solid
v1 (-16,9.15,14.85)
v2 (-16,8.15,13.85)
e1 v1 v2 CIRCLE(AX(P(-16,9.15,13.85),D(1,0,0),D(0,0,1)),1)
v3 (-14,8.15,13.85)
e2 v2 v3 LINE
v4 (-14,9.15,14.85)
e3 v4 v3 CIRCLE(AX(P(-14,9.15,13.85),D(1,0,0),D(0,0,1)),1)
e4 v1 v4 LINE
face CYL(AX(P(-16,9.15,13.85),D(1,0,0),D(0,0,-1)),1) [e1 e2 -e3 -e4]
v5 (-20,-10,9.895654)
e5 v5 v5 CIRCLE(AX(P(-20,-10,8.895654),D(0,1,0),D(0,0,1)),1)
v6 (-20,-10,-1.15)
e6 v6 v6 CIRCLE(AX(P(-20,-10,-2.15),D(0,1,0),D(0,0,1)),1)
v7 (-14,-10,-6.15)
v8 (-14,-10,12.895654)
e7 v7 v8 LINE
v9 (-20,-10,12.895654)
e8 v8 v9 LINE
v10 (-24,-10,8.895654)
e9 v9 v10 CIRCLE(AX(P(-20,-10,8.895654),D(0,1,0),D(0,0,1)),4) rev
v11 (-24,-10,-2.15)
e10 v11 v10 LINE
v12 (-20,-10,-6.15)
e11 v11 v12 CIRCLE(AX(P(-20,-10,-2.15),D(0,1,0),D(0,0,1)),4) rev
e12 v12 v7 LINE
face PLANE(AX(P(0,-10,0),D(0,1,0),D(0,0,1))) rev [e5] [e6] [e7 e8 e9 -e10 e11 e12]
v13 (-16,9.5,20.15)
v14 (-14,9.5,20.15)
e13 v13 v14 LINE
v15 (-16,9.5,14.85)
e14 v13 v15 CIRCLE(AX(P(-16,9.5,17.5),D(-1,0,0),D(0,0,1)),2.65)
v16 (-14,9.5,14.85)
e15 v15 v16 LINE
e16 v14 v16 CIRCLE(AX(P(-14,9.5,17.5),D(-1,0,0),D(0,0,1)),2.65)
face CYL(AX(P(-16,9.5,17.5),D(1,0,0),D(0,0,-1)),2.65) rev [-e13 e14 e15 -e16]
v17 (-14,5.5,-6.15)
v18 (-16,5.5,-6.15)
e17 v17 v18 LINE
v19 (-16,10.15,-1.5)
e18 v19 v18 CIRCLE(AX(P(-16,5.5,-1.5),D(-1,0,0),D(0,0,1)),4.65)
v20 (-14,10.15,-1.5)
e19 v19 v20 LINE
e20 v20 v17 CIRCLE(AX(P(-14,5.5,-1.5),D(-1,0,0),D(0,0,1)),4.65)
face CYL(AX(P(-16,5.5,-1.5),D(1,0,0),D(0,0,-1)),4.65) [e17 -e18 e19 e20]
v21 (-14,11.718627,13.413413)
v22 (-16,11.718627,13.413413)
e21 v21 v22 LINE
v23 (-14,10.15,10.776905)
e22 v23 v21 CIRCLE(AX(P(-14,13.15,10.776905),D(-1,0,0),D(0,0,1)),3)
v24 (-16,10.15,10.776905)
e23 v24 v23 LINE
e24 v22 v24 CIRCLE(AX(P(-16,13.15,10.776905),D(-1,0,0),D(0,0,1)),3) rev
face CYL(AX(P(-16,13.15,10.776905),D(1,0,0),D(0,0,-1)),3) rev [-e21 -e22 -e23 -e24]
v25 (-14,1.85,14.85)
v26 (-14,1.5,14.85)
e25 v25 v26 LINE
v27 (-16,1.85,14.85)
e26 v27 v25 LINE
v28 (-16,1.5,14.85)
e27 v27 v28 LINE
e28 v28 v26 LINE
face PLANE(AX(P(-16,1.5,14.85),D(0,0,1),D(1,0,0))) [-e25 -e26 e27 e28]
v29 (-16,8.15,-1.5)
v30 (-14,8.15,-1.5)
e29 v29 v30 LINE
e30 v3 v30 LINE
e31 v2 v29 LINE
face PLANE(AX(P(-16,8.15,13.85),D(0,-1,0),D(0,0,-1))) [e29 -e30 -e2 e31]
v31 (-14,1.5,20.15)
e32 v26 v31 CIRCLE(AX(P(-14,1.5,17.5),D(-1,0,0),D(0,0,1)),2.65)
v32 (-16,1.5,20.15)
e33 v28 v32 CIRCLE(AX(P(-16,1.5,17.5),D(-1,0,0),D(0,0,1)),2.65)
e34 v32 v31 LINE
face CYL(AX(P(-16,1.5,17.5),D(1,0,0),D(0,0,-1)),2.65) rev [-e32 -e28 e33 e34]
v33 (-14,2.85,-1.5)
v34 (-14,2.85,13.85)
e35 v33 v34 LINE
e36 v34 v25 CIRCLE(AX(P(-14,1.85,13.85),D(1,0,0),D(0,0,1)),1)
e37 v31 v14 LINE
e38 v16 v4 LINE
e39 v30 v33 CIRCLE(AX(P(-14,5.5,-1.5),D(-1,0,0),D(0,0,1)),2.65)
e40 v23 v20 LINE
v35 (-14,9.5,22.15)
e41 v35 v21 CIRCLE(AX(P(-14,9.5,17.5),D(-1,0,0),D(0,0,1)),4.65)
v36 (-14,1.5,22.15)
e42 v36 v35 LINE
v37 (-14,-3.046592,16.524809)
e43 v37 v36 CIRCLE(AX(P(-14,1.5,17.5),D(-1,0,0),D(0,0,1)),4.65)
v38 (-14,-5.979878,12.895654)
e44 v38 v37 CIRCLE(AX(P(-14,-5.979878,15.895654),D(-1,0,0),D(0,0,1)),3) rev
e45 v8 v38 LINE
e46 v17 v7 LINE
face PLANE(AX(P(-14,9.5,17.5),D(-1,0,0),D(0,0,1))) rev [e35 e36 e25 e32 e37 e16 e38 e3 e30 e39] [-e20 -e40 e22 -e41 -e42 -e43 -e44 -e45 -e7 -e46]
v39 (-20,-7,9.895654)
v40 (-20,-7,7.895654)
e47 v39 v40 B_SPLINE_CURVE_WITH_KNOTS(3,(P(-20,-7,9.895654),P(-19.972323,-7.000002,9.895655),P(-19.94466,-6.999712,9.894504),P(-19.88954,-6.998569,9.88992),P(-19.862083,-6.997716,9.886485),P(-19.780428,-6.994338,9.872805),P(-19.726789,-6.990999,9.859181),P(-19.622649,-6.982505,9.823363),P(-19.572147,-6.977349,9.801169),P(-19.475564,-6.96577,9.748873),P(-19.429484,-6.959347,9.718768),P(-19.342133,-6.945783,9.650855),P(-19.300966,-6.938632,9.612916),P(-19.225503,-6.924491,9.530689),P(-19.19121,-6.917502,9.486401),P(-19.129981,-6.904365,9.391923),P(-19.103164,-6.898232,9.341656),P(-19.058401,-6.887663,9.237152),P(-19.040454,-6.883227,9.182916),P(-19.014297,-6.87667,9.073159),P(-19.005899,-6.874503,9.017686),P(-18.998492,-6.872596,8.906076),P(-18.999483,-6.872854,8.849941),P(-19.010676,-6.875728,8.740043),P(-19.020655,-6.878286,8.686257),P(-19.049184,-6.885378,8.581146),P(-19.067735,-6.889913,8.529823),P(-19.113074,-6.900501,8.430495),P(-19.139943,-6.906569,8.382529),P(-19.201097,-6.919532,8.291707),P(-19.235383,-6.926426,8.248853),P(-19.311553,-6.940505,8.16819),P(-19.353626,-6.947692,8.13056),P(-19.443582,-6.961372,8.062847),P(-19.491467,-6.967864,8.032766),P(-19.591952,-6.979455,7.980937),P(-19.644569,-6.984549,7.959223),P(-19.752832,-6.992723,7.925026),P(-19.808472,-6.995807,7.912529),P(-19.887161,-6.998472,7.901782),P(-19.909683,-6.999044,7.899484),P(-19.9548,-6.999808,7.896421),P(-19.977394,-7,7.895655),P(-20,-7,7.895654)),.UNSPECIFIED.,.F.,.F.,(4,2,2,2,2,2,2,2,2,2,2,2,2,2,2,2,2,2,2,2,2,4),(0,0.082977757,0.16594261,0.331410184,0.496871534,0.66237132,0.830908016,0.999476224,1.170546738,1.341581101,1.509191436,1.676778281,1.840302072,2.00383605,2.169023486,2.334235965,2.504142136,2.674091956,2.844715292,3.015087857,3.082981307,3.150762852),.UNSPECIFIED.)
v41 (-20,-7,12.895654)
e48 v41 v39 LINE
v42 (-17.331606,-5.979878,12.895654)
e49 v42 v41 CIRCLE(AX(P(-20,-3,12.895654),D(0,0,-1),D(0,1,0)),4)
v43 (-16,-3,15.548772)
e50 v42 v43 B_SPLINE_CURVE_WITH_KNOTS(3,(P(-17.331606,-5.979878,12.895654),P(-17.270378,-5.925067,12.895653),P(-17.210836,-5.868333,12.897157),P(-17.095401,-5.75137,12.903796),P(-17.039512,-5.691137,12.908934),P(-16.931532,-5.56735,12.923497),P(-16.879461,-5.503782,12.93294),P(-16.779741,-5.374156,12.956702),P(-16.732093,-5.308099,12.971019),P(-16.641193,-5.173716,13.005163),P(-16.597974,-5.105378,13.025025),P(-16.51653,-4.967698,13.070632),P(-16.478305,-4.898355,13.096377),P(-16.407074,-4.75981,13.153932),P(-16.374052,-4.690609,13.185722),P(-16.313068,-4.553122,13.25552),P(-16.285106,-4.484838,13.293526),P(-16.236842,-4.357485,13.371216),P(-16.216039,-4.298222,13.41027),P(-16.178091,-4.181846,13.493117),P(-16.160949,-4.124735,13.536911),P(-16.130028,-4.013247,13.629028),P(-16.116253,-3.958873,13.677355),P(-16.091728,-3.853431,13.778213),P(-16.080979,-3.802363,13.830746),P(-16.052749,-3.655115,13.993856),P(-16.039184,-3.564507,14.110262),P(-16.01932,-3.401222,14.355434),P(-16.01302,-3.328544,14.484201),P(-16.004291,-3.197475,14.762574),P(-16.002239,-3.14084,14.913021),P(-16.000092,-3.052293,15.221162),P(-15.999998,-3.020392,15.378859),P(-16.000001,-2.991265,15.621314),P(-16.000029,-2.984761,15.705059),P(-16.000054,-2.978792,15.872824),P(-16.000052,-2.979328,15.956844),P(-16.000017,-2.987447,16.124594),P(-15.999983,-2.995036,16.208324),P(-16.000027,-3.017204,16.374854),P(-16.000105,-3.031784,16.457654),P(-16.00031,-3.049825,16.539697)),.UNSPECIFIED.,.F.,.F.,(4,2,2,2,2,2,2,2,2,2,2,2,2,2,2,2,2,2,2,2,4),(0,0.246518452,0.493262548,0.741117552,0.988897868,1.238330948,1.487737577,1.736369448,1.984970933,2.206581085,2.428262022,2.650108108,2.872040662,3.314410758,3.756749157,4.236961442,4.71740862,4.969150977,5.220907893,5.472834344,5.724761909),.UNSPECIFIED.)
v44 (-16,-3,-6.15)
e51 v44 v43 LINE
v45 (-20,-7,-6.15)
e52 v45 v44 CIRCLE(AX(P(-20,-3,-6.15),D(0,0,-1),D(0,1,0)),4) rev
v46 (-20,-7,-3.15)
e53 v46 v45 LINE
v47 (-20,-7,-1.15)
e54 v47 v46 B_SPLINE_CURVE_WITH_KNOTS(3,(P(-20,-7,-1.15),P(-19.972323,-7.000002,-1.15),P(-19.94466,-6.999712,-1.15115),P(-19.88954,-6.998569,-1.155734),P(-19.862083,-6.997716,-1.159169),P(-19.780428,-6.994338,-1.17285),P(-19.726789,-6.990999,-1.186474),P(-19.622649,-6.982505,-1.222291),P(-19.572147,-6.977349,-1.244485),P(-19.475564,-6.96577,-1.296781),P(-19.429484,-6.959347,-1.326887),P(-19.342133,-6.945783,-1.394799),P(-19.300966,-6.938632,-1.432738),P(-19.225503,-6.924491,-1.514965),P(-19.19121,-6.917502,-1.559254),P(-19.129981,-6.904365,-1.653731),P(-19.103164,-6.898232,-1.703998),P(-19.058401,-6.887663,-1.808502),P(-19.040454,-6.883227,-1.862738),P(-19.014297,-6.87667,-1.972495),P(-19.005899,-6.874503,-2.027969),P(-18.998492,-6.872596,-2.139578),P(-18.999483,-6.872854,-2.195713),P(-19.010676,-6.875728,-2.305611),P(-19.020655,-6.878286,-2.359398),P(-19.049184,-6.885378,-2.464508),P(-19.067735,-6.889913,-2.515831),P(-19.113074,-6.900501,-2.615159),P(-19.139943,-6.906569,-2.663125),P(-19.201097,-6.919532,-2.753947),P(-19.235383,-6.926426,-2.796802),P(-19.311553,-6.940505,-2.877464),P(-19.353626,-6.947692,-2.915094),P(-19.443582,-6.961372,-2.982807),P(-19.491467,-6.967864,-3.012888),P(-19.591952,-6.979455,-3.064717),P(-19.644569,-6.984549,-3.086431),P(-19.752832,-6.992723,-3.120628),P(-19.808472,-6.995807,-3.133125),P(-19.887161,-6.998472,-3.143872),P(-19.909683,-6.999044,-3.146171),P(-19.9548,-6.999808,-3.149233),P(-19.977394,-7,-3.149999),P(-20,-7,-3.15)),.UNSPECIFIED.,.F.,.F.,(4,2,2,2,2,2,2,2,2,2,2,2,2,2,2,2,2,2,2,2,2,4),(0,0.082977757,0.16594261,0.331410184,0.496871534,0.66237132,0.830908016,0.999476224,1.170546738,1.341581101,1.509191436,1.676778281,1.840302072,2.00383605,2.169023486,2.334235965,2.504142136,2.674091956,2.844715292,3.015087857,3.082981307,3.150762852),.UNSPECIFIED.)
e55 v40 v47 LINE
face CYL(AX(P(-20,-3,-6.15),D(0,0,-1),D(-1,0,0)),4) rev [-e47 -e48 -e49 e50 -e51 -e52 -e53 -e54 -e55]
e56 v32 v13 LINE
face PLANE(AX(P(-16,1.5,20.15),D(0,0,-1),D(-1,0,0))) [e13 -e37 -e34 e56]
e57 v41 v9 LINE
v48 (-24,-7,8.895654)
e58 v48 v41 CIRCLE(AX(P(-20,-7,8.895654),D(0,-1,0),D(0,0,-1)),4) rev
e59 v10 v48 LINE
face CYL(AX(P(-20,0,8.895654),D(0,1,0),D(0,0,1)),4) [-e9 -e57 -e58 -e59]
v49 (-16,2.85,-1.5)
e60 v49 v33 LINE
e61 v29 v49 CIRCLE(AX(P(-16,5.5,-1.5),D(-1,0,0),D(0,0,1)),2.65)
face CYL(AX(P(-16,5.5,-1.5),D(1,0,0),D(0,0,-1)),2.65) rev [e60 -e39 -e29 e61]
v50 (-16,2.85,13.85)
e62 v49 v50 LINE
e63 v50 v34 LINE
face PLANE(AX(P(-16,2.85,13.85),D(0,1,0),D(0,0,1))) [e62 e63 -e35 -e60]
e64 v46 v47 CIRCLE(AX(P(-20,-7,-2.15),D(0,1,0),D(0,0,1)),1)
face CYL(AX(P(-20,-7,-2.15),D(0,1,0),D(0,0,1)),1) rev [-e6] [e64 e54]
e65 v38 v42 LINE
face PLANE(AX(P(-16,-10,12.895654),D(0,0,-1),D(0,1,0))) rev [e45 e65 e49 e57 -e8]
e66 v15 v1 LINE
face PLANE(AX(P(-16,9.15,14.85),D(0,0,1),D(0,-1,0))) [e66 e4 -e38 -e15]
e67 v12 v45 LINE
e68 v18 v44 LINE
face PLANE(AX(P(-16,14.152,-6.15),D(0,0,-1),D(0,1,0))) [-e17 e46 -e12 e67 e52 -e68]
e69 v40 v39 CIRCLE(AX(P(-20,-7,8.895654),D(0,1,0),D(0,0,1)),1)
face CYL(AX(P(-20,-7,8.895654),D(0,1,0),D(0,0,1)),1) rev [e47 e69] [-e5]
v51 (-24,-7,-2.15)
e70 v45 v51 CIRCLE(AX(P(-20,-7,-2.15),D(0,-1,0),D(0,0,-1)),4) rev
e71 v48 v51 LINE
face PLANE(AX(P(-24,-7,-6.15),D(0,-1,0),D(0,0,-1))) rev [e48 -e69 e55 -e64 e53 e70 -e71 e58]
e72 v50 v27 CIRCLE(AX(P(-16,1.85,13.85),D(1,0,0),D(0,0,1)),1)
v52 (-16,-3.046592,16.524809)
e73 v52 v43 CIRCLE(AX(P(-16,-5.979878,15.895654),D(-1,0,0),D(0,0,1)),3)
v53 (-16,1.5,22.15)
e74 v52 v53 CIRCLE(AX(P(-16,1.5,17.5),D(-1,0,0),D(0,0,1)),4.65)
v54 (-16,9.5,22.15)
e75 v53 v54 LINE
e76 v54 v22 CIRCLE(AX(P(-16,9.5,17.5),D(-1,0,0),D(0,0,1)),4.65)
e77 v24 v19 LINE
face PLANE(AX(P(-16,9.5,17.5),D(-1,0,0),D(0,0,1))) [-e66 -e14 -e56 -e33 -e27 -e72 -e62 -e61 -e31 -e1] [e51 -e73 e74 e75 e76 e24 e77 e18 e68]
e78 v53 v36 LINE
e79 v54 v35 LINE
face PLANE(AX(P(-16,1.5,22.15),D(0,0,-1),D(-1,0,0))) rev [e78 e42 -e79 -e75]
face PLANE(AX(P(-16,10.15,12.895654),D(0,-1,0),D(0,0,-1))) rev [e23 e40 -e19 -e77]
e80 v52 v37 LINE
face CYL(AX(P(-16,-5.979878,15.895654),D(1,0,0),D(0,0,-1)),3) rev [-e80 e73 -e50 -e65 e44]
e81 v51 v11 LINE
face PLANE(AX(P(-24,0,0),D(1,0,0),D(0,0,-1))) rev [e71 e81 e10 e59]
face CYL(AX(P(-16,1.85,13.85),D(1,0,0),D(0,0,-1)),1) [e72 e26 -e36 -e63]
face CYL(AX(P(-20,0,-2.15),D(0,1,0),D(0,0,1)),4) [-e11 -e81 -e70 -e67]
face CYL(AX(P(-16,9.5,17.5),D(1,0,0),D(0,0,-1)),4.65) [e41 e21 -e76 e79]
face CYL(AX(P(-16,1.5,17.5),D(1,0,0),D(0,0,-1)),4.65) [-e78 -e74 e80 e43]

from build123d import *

# Parameters (mm, degrees)
BOSS_EXTRUDE1_DEPTH = 2
BOSS_EXTRUDE2_START = -16
BOSS_EXTRUDE2_DEPTH = 2
SKETCH3_W           = 19.045654227
SKETCH3_H           = 3
BOSS_EXTRUDE3_DEPTH = 8
FILLET1_R           = 4
SKETCH5_W           = 1
SKETCH5_H           = 3
HOLE1_AT_2_COUNT    = 2
HOLE1_AT_2_PITCH    = 11.045654227
CUT_EXTRUDE1_START  = 2
SKETCH6_R           = 1
CUT_EXTRUDE1_DEPTH  = 2
FILLET2_R           = 3
FILLET3_R           = 3


# Read off the part's stored shape, not the designer's step: Boss-Extrude2
with BuildPart() as part:
    # Sketch1 → Boss-Extrude1 (new body)
    with BuildSketch(Plane.ZY.offset(14)):
        with BuildLine():
            Line((12.895654227, 10.15), (-1.5, 10.15))
            ThreePointArc((-1.5, 10.15), (-6.15, 5.5), (-1.5, 0.85))
            Line((-1.5, 0.85), (12.895654227, 0.85))
            ThreePointArc((12.895654227, 0.85), (17.825800671, -3.138572401), (22.15, 1.5))
            Line((22.15, 1.5), (22.15, 9.5))
            ThreePointArc((22.15, 9.5), (17.825800671, 14.138572401), (12.895654227, 10.15))
        make_face()
        with BuildLine():
            Line((13.85, 8.15), (-1.5, 8.15))
            ThreePointArc((-1.5, 8.15), (-4.15, 5.5), (-1.5, 2.85))
            Line((-1.5, 2.85), (13.85, 2.85))
            ThreePointArc((13.85, 2.85), (14.557106781, 2.557106781), (14.85, 1.85))
            Line((14.85, 1.85), (14.85, 1.5))
            ThreePointArc((14.85, 1.5), (17.5, -1.15), (20.15, 1.5))
            Line((20.15, 1.5), (20.15, 9.5))
            ThreePointArc((20.15, 9.5), (17.5, 12.15), (14.85, 9.5))
            Line((14.85, 9.5), (14.85, 9.15))
            ThreePointArc((14.85, 9.15), (14.557106781, 8.442893219), (13.85, 8.15))
        make_face(mode=Mode.SUBTRACT)
    extrude(amount=BOSS_EXTRUDE1_DEPTH)

    # Boss-Extrude2 outline → Boss-Extrude2 (add)
    with BuildSketch(Plane.YZ.offset(BOSS_EXTRUDE2_START)):
        with BuildLine():
            Line((-10, 12.895654227), (-10, -6.15))
            Line((-10, -6.15), (5.5, -6.15))
            ThreePointArc((5.5, -6.15), (2.211953467, -4.788046533), (0.85, -1.5))
            Line((0.85, -1.5), (0.85, 12.895654227))
            Line((0.85, 12.895654227), (-10, 12.895654227))
        make_face()
    extrude(amount=BOSS_EXTRUDE2_DEPTH)

    # Sketch3 → Boss-Extrude3 (add)
    with BuildSketch(Plane.ZY.offset(16)):
        with Locations((3.372827114, -8.5)):
            Rectangle(SKETCH3_W, SKETCH3_H)
    extrude(amount=BOSS_EXTRUDE3_DEPTH)

    # Fillet1
    fillet1_edges = [part.edges().sort_by_distance(p)[0] for p in [
        (-24, -8.5, 12.895654227),
        (-24, -8.5, -6.15),
        (-16, -7, 3.372827113),
    ]]
    fillet(fillet1_edges, radius=FILLET1_R - 0.0001)  # a hair under: the kernel refuses the full size

    # Sketch5 → Hole1 (revolve, cut)
    with BuildSketch(Plane(origin=(-20, -7, -2.15), x_dir=(0, 0, 1), z_dir=(1, 0, 0))):
        with Locations((0.5, 1.5)):
            Rectangle(SKETCH5_W, SKETCH5_H)
    hole1 = revolve(axis=Axis((-20, -117, -2.15), (0, 1, 0)), mode=Mode.SUBTRACT)

    # Hole1 at 2: Hole1 ×2
    with Locations(*[(0, 0, i * HOLE1_AT_2_PITCH) for i in range(1, HOLE1_AT_2_COUNT)]):
        add(hole1, mode=Mode.SUBTRACT)

    # Sketch6 → Cut-Extrude1 (cut)
    with BuildSketch(Plane(origin=(0, -7, 0), x_dir=(1, 0, 0), z_dir=(0, 1, 0)).offset(CUT_EXTRUDE1_START)):
        with Locations(Location((-20, -8.895654227, 0), (0, 0, 270))):
            Circle(SKETCH6_R)
        with Locations(Location((-20, 2.15, 0), (0, 0, 270))):
            Circle(SKETCH6_R)
    extrude(amount=-CUT_EXTRUDE1_DEPTH, mode=Mode.SUBTRACT)

    # Fillet2
    fillet2_edges = [part.edges().sort_by_distance(p)[0] for p in [
        (-15, 10.15, 12.895654227),
    ]]
    fillet(fillet2_edges, radius=FILLET2_R)

    # Fillet3
    fillet3_edges = [part.edges().sort_by_distance(p)[0] for p in [
        (-15, 0.85, 12.895654227),
    ]]
    fillet(fillet3_edges, radius=FILLET3_R)


solid = part.part
